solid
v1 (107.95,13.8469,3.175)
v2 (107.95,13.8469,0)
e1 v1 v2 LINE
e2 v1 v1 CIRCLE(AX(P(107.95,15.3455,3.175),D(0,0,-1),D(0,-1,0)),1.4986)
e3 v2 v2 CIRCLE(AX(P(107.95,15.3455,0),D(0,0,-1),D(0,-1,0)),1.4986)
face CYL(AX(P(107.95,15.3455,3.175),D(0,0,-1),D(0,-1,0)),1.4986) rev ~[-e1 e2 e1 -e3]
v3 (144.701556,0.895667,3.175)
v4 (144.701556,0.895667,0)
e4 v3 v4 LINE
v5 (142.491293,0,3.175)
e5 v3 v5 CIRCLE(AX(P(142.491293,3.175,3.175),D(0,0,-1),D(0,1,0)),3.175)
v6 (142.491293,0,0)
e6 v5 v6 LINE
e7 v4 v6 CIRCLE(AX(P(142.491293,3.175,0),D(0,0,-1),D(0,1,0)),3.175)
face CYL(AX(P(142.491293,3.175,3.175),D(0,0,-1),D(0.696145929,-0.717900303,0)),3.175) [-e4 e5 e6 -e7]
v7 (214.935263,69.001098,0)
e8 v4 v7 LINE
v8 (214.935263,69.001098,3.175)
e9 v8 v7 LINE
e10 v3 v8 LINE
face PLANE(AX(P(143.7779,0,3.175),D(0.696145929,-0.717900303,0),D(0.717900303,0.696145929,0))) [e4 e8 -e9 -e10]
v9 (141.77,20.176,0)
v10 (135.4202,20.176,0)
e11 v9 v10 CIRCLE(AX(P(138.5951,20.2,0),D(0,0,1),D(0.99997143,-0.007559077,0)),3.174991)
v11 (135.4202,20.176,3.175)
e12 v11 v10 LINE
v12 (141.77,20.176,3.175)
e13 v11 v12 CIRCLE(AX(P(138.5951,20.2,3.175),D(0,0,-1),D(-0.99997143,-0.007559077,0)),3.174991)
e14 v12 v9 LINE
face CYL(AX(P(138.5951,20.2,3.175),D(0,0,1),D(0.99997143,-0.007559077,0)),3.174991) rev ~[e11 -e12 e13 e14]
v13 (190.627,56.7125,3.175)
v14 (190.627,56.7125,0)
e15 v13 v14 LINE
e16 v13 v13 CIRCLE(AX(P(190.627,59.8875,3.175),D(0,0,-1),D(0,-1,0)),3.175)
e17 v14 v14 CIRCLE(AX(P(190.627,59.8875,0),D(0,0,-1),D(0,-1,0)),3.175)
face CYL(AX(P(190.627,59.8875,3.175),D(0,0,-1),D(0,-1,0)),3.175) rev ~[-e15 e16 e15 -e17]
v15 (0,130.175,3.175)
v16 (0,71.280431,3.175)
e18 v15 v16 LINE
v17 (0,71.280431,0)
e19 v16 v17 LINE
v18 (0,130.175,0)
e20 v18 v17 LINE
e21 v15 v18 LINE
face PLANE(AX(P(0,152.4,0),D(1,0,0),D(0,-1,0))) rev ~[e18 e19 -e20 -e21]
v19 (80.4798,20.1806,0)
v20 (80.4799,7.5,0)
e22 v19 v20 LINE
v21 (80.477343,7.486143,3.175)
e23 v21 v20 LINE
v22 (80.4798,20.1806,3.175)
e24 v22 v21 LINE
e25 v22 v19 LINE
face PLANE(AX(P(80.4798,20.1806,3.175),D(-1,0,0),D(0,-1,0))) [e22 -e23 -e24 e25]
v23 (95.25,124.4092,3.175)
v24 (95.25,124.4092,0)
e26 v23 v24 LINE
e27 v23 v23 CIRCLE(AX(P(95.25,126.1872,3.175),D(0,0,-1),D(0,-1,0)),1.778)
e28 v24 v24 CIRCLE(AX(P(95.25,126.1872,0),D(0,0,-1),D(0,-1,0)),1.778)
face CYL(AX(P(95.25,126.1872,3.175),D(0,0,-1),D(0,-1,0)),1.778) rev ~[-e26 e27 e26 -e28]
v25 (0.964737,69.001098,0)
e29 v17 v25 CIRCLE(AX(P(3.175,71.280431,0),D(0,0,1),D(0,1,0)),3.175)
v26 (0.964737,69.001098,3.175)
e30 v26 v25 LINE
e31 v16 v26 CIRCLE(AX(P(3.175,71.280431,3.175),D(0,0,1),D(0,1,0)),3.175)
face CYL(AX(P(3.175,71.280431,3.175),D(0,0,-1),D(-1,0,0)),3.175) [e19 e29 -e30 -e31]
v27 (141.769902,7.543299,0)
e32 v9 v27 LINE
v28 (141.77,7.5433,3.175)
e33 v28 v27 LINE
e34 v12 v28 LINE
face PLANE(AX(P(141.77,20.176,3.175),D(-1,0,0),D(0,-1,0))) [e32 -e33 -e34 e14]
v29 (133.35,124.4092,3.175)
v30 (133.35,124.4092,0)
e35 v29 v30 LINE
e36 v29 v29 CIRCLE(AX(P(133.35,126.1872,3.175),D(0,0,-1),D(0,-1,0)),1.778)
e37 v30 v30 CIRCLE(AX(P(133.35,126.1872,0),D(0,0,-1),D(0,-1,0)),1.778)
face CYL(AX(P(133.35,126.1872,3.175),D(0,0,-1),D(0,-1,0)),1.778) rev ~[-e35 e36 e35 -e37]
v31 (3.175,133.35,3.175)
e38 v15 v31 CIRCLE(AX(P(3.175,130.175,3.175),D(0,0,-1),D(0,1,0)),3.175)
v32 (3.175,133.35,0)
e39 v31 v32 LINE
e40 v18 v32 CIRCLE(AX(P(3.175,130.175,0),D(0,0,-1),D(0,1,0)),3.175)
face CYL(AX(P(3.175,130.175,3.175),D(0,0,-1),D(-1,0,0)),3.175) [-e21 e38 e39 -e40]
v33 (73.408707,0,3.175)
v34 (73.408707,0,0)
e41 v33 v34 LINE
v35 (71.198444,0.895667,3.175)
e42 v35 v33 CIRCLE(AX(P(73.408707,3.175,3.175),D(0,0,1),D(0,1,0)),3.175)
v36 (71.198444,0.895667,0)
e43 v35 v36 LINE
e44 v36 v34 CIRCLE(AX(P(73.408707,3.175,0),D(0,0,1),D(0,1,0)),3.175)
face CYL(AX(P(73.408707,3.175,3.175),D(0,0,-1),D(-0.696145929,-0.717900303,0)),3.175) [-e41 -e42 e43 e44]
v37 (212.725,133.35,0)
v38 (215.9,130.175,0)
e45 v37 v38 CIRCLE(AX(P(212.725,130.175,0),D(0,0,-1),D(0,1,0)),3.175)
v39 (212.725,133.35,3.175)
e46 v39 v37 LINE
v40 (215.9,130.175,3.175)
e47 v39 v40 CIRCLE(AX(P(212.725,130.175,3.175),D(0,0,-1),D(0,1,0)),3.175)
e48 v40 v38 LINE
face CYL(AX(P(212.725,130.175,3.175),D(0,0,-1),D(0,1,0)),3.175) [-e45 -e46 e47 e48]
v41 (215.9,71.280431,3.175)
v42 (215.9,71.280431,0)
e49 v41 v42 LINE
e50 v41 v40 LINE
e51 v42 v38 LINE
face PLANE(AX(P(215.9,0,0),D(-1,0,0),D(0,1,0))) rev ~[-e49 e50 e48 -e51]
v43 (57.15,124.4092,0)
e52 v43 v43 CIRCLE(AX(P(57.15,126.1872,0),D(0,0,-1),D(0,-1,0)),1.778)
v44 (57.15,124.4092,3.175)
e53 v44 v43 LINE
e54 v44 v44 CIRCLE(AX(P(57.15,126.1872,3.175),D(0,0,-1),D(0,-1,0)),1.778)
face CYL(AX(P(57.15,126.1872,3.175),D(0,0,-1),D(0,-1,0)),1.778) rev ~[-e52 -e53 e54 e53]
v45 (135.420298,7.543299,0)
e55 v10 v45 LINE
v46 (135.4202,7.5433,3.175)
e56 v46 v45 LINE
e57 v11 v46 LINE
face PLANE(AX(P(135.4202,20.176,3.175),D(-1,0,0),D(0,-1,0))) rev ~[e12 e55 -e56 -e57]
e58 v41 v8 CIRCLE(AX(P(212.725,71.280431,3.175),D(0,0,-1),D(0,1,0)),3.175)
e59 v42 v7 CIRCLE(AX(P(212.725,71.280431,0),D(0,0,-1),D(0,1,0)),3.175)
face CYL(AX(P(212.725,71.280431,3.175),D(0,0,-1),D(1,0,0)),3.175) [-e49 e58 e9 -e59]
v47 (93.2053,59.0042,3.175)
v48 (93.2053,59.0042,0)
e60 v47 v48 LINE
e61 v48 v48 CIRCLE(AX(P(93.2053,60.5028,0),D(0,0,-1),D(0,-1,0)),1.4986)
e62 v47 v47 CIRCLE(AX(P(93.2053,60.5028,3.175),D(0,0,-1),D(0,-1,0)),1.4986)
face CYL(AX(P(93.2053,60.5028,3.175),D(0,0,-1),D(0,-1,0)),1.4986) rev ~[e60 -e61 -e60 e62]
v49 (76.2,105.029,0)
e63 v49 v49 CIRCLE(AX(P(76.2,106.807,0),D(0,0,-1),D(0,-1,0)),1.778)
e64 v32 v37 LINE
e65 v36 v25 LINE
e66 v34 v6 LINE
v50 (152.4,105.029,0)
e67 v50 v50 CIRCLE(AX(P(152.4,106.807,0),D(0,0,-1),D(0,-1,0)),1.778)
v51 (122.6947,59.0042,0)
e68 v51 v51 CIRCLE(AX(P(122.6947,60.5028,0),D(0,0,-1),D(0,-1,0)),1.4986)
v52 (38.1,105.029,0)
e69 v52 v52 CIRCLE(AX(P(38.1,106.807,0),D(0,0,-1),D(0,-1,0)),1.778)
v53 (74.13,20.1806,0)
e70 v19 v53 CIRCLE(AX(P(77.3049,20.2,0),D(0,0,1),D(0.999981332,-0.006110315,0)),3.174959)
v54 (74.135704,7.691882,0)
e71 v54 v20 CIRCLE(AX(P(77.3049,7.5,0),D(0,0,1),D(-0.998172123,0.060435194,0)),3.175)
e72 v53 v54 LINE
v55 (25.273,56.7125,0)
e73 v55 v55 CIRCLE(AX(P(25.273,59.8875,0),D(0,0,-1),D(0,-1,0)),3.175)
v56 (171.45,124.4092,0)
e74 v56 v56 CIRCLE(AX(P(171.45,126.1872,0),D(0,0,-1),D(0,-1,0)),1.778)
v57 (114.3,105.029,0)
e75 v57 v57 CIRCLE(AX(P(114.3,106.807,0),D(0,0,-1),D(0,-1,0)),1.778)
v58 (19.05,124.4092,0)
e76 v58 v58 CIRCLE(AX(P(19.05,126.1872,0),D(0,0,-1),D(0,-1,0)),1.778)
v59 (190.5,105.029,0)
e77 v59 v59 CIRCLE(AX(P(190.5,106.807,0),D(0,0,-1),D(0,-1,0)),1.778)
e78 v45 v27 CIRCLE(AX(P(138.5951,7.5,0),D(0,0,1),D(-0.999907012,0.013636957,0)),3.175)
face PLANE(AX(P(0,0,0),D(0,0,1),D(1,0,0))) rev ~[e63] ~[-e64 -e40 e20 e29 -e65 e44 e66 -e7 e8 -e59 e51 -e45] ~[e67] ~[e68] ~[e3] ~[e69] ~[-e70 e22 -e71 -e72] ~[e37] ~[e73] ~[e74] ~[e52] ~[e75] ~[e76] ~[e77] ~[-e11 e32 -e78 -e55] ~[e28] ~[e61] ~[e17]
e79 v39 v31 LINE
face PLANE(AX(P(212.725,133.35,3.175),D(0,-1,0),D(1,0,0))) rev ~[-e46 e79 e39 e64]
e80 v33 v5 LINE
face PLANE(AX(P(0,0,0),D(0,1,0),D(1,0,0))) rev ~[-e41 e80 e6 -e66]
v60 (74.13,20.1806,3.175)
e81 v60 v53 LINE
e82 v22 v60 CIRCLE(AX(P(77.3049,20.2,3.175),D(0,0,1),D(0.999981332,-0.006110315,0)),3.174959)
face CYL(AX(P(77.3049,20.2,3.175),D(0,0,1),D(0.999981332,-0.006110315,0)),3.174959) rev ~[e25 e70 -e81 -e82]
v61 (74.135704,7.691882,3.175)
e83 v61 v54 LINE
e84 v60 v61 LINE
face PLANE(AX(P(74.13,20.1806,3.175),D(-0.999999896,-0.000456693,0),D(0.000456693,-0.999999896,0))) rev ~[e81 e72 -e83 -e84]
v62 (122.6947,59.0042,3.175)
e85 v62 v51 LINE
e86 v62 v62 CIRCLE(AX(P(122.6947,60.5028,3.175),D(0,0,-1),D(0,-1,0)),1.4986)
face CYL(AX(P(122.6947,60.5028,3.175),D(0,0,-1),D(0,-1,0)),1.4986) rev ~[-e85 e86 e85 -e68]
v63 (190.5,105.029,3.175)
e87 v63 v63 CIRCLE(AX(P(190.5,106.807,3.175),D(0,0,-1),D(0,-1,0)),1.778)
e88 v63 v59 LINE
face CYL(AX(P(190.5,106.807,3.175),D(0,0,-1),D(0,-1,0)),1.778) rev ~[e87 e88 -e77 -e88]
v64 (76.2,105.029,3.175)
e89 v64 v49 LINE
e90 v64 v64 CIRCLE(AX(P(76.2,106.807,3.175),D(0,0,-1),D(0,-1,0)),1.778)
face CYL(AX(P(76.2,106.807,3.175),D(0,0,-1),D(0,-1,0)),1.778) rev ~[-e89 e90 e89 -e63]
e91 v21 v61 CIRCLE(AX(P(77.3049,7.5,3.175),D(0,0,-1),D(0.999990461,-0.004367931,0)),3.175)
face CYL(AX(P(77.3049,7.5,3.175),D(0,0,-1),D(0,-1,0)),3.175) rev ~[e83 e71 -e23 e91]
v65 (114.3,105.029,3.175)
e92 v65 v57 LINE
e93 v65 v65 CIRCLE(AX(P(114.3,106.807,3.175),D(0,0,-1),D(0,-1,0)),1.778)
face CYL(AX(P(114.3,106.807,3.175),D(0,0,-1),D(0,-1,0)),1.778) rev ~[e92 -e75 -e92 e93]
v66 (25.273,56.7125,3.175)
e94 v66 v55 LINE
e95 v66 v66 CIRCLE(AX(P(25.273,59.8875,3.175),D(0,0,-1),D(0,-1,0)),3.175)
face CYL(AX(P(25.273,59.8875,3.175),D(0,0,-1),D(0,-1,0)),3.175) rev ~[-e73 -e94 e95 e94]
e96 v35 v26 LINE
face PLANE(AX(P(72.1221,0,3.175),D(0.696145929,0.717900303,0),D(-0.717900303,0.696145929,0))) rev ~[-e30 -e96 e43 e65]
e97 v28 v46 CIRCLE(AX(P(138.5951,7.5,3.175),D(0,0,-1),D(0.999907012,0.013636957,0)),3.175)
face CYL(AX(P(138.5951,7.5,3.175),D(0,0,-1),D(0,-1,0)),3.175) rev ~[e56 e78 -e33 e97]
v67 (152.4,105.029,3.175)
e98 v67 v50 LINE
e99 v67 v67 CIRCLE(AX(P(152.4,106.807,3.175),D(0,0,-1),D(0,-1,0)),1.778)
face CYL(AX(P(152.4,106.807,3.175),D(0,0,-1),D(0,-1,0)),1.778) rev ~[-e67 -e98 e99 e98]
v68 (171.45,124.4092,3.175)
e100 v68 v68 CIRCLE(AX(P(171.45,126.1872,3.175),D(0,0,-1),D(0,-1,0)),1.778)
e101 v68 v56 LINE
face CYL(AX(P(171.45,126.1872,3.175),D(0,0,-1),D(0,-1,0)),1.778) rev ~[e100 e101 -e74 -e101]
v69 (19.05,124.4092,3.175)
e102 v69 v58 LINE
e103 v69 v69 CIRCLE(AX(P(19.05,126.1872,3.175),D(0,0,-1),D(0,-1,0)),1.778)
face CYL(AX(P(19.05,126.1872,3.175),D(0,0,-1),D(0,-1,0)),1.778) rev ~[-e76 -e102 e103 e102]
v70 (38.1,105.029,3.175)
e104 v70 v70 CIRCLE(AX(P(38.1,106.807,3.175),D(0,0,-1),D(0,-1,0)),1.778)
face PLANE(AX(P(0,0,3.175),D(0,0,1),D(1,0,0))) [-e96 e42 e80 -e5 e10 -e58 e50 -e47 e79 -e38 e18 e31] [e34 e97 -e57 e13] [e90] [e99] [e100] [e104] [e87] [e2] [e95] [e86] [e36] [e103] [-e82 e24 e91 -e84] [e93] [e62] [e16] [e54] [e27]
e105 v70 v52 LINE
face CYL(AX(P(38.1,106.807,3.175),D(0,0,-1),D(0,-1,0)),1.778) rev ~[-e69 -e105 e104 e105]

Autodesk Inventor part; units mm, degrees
ref_plane "YZ Plane" through (0, 0, 0) normal (1, 0, 0) x (0, 1, 0)
ref_plane "XZ Plane" through (0, 0, 0) normal (0, 1, 0) x (-1, 0, 0)
ref_plane "XY Plane" through (0, 0, 0) normal (0, 0, 1) x (1, 0, 0)
sketch "Sketch1" plane through (0, 0, 0) normal (0, 0, 1) x (1, 0, 0)
  line L0 (0, 0) -> (215.9, 0)
  line L1 (215.9, 0) -> (215.9, 152.4)
  line L2 (215.9, 152.4) -> (0, 152.4)
  line L3 (0, 152.4) -> (0, 0)
  dimension "d0" = 215.9
  dimension "d1" = 152.4
extrude "Extrusion1" add sketch "Sketch1" along normal blind 3.175
sketch "Sketch2" plane through (0, 0, 3.175) normal (0, 0, 1) x (1, 0, 0)
  line L0 (215.9, 152.4) -> (0, 152.4) construction
  line L1 (107.95, 152.4) -> (107.95, 0) construction
  line L2 (0, 0) -> (215.9, 0) projected
  point P0 (25.273, 59.8875)
  point P1 (77.3049, 7.5)
  point P2 (190.627, 59.8875)
  point P3 (138.5951, 7.5)
  dimension "d5" = 30.6451
  dimension "d7" = 82.677
  dimension "d9" = 52.3875
  dimension "d10" = 7.5
hole "Hole1" at (25.273, 59.8875, 3.175) at (77.3049, 7.5, 3.175) at (190.627, 59.8875, 3.175) at (138.5951, 7.5, 3.175) direction (0, 0, -1) diameter 6.35 end through all
sketch "Sketch3" plane through (0, 0, 3.175) normal (0, 0, 1) x (1, 0, 0)
  line L0 (215.9, 152.4) -> (0, 152.4) projected
  line L1 (107.95, 152.4) -> (107.95, 0)
  line L2 (0, 0) -> (215.9, 0) projected
  line L3 (21.4376, 59.8875) -> (76.2, 7.5) construction
  line L4 (0, 152.4) -> (0, 0) projected
  line L5 (0, 130.175) -> (0, 78.2462)
  line L6 (3.175, 133.35) -> (107.95, 133.35)
  line L7 (0, 133.35) -> (0, 125.3708)
  line L8 (194.4624, 59.8875) -> (139.7, 7.5) construction
  line L9 (215.9, 152.4) -> (215.9, 78.2462)
  line L10 (215.9, 133.35) -> (215.9, 76.9596)
  line L11 (212.725, 133.35) -> (107.95, 133.35)
  line L12 (215.9, 130.175) -> (215.9, 125.3708)
  line L13 (75.9713, 0) -> (107.95, 0)
  line L14 (139.9287, 0) -> (107.95, 0)
  line L15 (215.9, 0) -> (215.9, 152.4) projected
  line L16 (107.95, 56.0437) -> (190.627, 56.0437) construction
  line L17 (0, 0) -> (215.9, 0) projected
  line L18 (143.7779, 0) -> (215.9, 69.9366)
  line L19 (72.1221, 0) -> (0, 69.9366)
  line L20 (0, 152.4) -> (0, 0) projected
  line L21 (72.1221, 0) -> (107.95, 0)
  line L22 (3.175, 133.35) -> (0, 133.35)
  line L23 (212.725, 133.35) -> (215.9, 133.35)
  point P0 (74.6275, 0)
  point P1 (0, 76.9596)
  point P2 (77.9849, 0)
  dimension "d20" = 19.05
  dimension "d36" = 135.881
  dimension "d37" = 135.881
  dimension "d41" = 35.8279
sketch "Sketch4" plane through (0, 0, 3.175) normal (0, 0, 1) x (1, 0, 0)
  arc A0 (80.4798, 20.1806) -> (74.13, 20.1806) centre (77.3049, 20.2) ccw
  circle A1 centre (77.3049, 7.5) radius 3.175 projected
  circle A2 centre (77.3049, 7.5) radius 3.175 projected
  line L0 (3.175, 133.35) -> (212.725, 133.35) projected
  line L1 (107.95, 133.35) -> (107.95, 0) construction
  line L2 (0, 0) -> (215.9, 0) projected
  arc A3 (141.77, 20.176) -> (135.4202, 20.176) centre (138.5951, 20.2) ccw
  arc A4 (74.1357, 7.5165) -> (80.474, 7.4806) centre (77.3049, 7.5) ccw
  circle A5 centre (138.5951, 7.5) radius 3.175 projected
  arc A6 (135.4202, 7.5433) -> (141.77, 7.5433) centre (138.5951, 7.5) ccw
  line L3 (141.77, 20.176) -> (141.77, 7.476)
  circle A7 centre (138.5951, 7.5) radius 3.175 projected
  line L4 (141.77, 20.176) -> (154.47, 20.176) construction
  line L5 (135.4202, 20.176) -> (135.4202, 7.476)
  line L6 (135.4202, 20.176) -> (148.1202, 20.176) construction
  line L7 (80.4798, 20.1806) -> (80.4798, 7.4806)
  line L8 (80.4798, 20.1806) -> (93.1798, 20.1806) construction
  line L9 (74.13, 20.1806) -> (74.1358, 7.4806)
  line L10 (74.13, 20.1806) -> (86.83, 20.1806) construction
  line L11 (74.13, 20.1806) -> (80.4798, 20.1806)
  line L12 (74.1358, 7.4806) -> (80.4798, 7.4806)
  line L13 (135.4202, 7.476) -> (141.77, 7.476)
  line L14 (135.4202, 20.176) -> (141.77, 20.176)
  line L15 (107.95, 0) -> (107.95, 152.4)
  line L16 (215.9, 152.4) -> (0, 152.4) projected
  line L17 (138.5951, 7.5) -> (107.95, 7.5)
  line L18 (138.5951, 20.2) -> (107.95, 20.2)
  line L19 (138.5951, 20.2) -> (169.2402, 20.2) construction
  point P0 (75.9713, 0)
  point P1 (139.9287, 0)
  point P2 (136.525, 7.4971)
  dimension "d29" = 6.35
  dimension "d30" = 12.7
  dimension "d44" = 90
  dimension "d45" = 90
  dimension "d46" = 90
  dimension "d48" = 12.7
  dimension "d49" = 12.7
  dimension "d50" = 12.7
  dimension "d117" = 180
extrude "Extrusion3" cut sketch "Sketch3" against normal blind 25.4 contours L9 L23 L11 L1 L0 | L1 L6 L22 L4 L0 | L2 L4 L19 | L18 L15 L2
extrude "Extrusion5" cut sketch "Sketch4" against normal blind 25.4 contours L11 A0 | L7 A1 L9 L11 | A1 L12 A4 L9 | L9 A4 L12 A1 | A4 L12 | L14 A3 | L3 A5 L5 L14 | A5 L13 | A5 L13
fillet "Fillet1" radius 3.175 6 edges at (0, 69.9366, 1.5875) (0, 133.35, 1.5875) (215.9, 133.35, 1.5875) (215.9, 69.9366, 1.5875) (143.7779, 0, 1.5875) (72.1221, 0, 1.5875)
sketch "Sketch5" plane through (0, 0, 3.175) normal (0, 0, 1) x (1, 0, 0)
  line L0 (73.4087, 0) -> (142.4913, 0) projected
  line L1 (73.4087, 0) -> (142.4913, 0)
  line L2 (107.95, 0) -> (107.95, 133.35)
  line L3 (212.725, 133.35) -> (3.175, 133.35) projected
  line L4 (107.95, 0) -> (241.3, 0) construction
  line L5 (107.95, 0) -> (107.95, 30.691)
  line L6 (122.6947, 0) -> (122.6947, 60.5028)
  line L7 (122.6947, 0) -> (183.1975, 0) construction
  circle A0 centre (107.95, 15.3455) radius 1.4986
  point P0 (0, 0)
  point P1 (93.2053, 60.5028)
  dimension "d56" = 90
  dimension "d58" = 90
  dimension "d59" = 60.5028
  dimension "d60" = 2.9972
  dimension "d61" = 14.7447
  dimension "d62" = 14.7447
  dimension "d63" = 60.5028
hole "Hole2" at (107.95, 15.3455, 3.175) at (93.2053, 60.5028, 3.175) at (122.6947, 60.5028, 3.175) at (107.95, 15.3455, 3.175) at (122.6947, 60.5028, 3.175) direction (0, 0, -1) diameter 2.9972 end through all
sketch "Sketch7" plane through (0, 0, 3.175) normal (0, 0, 1) x (1, 0, 0)
  line L0 (212.725, 133.35) -> (3.175, 133.35) projected
  line L1 (0, 130.175) -> (0, 71.2804) projected
  point P0 (0, 0)
  point P1 (19.05, 126.1872)
  point P2 (38.1, 106.807)
  point P3 (57.15, 126.1872)
  point P4 (76.2, 106.807)
  point P5 (95.25, 126.1872)
  point P6 (114.3, 106.807)
  point P7 (133.35, 126.1872)
  point P8 (152.4, 106.807)
  point P9 (171.45, 126.1872)
  point P10 (190.5, 106.807)
  dimension "d83" = 7.1628
  dimension "d84" = 19.05
  dimension "d85" = 7.1628
  dimension "d89" = 26.543
  dimension "d90" = 26.543
  dimension "d94" = 38.1
  dimension "d95" = 57.15
  dimension "d96" = 76.2
  dimension "d97" = 7.1628
  dimension "d98" = 95.25
  dimension "d99" = 26.543
  dimension "d100" = 114.3
  dimension "d102" = 7.1628
  dimension "d103" = 133.35
  dimension "d104" = 26.543
  dimension "d105" = 152.4
  dimension "d106" = 7.1628
  dimension "d107" = 171.45
  dimension "d108" = 26.543
  dimension "d109" = 190.5
hole "Hole4" at (19.05, 126.1872, 3.175) at (38.1, 106.807, 3.175) at (57.15, 126.1872, 3.175) at (76.2, 106.807, 3.175) at (95.25, 126.1872, 3.175) at (114.3, 106.807, 3.175) at (133.35, 126.1872, 3.175) at (152.4, 106.807, 3.175) at (171.45, 126.1872, 3.175) at (190.5, 106.807, 3.175) direction (0, 0, -1) diameter 3.556 end through all
equation "\"d37\" = d36"
equation "\"d48\" = d30"
equation "\"d49\" = d50"
equation "\"d62\" = d61"
equation "\"d63\" = d59"
equation "\"d85\" = d83"
equation "\"d90\" = d89"
equation "\"d97\" = d83"
equation "\"d99\" = d89"
equation "\"d102\" = d83"
equation "\"d104\" = d89"
equation "\"d106\" = d83"
equation "\"d108\" = d89"
properties part number "new pulley plate"
